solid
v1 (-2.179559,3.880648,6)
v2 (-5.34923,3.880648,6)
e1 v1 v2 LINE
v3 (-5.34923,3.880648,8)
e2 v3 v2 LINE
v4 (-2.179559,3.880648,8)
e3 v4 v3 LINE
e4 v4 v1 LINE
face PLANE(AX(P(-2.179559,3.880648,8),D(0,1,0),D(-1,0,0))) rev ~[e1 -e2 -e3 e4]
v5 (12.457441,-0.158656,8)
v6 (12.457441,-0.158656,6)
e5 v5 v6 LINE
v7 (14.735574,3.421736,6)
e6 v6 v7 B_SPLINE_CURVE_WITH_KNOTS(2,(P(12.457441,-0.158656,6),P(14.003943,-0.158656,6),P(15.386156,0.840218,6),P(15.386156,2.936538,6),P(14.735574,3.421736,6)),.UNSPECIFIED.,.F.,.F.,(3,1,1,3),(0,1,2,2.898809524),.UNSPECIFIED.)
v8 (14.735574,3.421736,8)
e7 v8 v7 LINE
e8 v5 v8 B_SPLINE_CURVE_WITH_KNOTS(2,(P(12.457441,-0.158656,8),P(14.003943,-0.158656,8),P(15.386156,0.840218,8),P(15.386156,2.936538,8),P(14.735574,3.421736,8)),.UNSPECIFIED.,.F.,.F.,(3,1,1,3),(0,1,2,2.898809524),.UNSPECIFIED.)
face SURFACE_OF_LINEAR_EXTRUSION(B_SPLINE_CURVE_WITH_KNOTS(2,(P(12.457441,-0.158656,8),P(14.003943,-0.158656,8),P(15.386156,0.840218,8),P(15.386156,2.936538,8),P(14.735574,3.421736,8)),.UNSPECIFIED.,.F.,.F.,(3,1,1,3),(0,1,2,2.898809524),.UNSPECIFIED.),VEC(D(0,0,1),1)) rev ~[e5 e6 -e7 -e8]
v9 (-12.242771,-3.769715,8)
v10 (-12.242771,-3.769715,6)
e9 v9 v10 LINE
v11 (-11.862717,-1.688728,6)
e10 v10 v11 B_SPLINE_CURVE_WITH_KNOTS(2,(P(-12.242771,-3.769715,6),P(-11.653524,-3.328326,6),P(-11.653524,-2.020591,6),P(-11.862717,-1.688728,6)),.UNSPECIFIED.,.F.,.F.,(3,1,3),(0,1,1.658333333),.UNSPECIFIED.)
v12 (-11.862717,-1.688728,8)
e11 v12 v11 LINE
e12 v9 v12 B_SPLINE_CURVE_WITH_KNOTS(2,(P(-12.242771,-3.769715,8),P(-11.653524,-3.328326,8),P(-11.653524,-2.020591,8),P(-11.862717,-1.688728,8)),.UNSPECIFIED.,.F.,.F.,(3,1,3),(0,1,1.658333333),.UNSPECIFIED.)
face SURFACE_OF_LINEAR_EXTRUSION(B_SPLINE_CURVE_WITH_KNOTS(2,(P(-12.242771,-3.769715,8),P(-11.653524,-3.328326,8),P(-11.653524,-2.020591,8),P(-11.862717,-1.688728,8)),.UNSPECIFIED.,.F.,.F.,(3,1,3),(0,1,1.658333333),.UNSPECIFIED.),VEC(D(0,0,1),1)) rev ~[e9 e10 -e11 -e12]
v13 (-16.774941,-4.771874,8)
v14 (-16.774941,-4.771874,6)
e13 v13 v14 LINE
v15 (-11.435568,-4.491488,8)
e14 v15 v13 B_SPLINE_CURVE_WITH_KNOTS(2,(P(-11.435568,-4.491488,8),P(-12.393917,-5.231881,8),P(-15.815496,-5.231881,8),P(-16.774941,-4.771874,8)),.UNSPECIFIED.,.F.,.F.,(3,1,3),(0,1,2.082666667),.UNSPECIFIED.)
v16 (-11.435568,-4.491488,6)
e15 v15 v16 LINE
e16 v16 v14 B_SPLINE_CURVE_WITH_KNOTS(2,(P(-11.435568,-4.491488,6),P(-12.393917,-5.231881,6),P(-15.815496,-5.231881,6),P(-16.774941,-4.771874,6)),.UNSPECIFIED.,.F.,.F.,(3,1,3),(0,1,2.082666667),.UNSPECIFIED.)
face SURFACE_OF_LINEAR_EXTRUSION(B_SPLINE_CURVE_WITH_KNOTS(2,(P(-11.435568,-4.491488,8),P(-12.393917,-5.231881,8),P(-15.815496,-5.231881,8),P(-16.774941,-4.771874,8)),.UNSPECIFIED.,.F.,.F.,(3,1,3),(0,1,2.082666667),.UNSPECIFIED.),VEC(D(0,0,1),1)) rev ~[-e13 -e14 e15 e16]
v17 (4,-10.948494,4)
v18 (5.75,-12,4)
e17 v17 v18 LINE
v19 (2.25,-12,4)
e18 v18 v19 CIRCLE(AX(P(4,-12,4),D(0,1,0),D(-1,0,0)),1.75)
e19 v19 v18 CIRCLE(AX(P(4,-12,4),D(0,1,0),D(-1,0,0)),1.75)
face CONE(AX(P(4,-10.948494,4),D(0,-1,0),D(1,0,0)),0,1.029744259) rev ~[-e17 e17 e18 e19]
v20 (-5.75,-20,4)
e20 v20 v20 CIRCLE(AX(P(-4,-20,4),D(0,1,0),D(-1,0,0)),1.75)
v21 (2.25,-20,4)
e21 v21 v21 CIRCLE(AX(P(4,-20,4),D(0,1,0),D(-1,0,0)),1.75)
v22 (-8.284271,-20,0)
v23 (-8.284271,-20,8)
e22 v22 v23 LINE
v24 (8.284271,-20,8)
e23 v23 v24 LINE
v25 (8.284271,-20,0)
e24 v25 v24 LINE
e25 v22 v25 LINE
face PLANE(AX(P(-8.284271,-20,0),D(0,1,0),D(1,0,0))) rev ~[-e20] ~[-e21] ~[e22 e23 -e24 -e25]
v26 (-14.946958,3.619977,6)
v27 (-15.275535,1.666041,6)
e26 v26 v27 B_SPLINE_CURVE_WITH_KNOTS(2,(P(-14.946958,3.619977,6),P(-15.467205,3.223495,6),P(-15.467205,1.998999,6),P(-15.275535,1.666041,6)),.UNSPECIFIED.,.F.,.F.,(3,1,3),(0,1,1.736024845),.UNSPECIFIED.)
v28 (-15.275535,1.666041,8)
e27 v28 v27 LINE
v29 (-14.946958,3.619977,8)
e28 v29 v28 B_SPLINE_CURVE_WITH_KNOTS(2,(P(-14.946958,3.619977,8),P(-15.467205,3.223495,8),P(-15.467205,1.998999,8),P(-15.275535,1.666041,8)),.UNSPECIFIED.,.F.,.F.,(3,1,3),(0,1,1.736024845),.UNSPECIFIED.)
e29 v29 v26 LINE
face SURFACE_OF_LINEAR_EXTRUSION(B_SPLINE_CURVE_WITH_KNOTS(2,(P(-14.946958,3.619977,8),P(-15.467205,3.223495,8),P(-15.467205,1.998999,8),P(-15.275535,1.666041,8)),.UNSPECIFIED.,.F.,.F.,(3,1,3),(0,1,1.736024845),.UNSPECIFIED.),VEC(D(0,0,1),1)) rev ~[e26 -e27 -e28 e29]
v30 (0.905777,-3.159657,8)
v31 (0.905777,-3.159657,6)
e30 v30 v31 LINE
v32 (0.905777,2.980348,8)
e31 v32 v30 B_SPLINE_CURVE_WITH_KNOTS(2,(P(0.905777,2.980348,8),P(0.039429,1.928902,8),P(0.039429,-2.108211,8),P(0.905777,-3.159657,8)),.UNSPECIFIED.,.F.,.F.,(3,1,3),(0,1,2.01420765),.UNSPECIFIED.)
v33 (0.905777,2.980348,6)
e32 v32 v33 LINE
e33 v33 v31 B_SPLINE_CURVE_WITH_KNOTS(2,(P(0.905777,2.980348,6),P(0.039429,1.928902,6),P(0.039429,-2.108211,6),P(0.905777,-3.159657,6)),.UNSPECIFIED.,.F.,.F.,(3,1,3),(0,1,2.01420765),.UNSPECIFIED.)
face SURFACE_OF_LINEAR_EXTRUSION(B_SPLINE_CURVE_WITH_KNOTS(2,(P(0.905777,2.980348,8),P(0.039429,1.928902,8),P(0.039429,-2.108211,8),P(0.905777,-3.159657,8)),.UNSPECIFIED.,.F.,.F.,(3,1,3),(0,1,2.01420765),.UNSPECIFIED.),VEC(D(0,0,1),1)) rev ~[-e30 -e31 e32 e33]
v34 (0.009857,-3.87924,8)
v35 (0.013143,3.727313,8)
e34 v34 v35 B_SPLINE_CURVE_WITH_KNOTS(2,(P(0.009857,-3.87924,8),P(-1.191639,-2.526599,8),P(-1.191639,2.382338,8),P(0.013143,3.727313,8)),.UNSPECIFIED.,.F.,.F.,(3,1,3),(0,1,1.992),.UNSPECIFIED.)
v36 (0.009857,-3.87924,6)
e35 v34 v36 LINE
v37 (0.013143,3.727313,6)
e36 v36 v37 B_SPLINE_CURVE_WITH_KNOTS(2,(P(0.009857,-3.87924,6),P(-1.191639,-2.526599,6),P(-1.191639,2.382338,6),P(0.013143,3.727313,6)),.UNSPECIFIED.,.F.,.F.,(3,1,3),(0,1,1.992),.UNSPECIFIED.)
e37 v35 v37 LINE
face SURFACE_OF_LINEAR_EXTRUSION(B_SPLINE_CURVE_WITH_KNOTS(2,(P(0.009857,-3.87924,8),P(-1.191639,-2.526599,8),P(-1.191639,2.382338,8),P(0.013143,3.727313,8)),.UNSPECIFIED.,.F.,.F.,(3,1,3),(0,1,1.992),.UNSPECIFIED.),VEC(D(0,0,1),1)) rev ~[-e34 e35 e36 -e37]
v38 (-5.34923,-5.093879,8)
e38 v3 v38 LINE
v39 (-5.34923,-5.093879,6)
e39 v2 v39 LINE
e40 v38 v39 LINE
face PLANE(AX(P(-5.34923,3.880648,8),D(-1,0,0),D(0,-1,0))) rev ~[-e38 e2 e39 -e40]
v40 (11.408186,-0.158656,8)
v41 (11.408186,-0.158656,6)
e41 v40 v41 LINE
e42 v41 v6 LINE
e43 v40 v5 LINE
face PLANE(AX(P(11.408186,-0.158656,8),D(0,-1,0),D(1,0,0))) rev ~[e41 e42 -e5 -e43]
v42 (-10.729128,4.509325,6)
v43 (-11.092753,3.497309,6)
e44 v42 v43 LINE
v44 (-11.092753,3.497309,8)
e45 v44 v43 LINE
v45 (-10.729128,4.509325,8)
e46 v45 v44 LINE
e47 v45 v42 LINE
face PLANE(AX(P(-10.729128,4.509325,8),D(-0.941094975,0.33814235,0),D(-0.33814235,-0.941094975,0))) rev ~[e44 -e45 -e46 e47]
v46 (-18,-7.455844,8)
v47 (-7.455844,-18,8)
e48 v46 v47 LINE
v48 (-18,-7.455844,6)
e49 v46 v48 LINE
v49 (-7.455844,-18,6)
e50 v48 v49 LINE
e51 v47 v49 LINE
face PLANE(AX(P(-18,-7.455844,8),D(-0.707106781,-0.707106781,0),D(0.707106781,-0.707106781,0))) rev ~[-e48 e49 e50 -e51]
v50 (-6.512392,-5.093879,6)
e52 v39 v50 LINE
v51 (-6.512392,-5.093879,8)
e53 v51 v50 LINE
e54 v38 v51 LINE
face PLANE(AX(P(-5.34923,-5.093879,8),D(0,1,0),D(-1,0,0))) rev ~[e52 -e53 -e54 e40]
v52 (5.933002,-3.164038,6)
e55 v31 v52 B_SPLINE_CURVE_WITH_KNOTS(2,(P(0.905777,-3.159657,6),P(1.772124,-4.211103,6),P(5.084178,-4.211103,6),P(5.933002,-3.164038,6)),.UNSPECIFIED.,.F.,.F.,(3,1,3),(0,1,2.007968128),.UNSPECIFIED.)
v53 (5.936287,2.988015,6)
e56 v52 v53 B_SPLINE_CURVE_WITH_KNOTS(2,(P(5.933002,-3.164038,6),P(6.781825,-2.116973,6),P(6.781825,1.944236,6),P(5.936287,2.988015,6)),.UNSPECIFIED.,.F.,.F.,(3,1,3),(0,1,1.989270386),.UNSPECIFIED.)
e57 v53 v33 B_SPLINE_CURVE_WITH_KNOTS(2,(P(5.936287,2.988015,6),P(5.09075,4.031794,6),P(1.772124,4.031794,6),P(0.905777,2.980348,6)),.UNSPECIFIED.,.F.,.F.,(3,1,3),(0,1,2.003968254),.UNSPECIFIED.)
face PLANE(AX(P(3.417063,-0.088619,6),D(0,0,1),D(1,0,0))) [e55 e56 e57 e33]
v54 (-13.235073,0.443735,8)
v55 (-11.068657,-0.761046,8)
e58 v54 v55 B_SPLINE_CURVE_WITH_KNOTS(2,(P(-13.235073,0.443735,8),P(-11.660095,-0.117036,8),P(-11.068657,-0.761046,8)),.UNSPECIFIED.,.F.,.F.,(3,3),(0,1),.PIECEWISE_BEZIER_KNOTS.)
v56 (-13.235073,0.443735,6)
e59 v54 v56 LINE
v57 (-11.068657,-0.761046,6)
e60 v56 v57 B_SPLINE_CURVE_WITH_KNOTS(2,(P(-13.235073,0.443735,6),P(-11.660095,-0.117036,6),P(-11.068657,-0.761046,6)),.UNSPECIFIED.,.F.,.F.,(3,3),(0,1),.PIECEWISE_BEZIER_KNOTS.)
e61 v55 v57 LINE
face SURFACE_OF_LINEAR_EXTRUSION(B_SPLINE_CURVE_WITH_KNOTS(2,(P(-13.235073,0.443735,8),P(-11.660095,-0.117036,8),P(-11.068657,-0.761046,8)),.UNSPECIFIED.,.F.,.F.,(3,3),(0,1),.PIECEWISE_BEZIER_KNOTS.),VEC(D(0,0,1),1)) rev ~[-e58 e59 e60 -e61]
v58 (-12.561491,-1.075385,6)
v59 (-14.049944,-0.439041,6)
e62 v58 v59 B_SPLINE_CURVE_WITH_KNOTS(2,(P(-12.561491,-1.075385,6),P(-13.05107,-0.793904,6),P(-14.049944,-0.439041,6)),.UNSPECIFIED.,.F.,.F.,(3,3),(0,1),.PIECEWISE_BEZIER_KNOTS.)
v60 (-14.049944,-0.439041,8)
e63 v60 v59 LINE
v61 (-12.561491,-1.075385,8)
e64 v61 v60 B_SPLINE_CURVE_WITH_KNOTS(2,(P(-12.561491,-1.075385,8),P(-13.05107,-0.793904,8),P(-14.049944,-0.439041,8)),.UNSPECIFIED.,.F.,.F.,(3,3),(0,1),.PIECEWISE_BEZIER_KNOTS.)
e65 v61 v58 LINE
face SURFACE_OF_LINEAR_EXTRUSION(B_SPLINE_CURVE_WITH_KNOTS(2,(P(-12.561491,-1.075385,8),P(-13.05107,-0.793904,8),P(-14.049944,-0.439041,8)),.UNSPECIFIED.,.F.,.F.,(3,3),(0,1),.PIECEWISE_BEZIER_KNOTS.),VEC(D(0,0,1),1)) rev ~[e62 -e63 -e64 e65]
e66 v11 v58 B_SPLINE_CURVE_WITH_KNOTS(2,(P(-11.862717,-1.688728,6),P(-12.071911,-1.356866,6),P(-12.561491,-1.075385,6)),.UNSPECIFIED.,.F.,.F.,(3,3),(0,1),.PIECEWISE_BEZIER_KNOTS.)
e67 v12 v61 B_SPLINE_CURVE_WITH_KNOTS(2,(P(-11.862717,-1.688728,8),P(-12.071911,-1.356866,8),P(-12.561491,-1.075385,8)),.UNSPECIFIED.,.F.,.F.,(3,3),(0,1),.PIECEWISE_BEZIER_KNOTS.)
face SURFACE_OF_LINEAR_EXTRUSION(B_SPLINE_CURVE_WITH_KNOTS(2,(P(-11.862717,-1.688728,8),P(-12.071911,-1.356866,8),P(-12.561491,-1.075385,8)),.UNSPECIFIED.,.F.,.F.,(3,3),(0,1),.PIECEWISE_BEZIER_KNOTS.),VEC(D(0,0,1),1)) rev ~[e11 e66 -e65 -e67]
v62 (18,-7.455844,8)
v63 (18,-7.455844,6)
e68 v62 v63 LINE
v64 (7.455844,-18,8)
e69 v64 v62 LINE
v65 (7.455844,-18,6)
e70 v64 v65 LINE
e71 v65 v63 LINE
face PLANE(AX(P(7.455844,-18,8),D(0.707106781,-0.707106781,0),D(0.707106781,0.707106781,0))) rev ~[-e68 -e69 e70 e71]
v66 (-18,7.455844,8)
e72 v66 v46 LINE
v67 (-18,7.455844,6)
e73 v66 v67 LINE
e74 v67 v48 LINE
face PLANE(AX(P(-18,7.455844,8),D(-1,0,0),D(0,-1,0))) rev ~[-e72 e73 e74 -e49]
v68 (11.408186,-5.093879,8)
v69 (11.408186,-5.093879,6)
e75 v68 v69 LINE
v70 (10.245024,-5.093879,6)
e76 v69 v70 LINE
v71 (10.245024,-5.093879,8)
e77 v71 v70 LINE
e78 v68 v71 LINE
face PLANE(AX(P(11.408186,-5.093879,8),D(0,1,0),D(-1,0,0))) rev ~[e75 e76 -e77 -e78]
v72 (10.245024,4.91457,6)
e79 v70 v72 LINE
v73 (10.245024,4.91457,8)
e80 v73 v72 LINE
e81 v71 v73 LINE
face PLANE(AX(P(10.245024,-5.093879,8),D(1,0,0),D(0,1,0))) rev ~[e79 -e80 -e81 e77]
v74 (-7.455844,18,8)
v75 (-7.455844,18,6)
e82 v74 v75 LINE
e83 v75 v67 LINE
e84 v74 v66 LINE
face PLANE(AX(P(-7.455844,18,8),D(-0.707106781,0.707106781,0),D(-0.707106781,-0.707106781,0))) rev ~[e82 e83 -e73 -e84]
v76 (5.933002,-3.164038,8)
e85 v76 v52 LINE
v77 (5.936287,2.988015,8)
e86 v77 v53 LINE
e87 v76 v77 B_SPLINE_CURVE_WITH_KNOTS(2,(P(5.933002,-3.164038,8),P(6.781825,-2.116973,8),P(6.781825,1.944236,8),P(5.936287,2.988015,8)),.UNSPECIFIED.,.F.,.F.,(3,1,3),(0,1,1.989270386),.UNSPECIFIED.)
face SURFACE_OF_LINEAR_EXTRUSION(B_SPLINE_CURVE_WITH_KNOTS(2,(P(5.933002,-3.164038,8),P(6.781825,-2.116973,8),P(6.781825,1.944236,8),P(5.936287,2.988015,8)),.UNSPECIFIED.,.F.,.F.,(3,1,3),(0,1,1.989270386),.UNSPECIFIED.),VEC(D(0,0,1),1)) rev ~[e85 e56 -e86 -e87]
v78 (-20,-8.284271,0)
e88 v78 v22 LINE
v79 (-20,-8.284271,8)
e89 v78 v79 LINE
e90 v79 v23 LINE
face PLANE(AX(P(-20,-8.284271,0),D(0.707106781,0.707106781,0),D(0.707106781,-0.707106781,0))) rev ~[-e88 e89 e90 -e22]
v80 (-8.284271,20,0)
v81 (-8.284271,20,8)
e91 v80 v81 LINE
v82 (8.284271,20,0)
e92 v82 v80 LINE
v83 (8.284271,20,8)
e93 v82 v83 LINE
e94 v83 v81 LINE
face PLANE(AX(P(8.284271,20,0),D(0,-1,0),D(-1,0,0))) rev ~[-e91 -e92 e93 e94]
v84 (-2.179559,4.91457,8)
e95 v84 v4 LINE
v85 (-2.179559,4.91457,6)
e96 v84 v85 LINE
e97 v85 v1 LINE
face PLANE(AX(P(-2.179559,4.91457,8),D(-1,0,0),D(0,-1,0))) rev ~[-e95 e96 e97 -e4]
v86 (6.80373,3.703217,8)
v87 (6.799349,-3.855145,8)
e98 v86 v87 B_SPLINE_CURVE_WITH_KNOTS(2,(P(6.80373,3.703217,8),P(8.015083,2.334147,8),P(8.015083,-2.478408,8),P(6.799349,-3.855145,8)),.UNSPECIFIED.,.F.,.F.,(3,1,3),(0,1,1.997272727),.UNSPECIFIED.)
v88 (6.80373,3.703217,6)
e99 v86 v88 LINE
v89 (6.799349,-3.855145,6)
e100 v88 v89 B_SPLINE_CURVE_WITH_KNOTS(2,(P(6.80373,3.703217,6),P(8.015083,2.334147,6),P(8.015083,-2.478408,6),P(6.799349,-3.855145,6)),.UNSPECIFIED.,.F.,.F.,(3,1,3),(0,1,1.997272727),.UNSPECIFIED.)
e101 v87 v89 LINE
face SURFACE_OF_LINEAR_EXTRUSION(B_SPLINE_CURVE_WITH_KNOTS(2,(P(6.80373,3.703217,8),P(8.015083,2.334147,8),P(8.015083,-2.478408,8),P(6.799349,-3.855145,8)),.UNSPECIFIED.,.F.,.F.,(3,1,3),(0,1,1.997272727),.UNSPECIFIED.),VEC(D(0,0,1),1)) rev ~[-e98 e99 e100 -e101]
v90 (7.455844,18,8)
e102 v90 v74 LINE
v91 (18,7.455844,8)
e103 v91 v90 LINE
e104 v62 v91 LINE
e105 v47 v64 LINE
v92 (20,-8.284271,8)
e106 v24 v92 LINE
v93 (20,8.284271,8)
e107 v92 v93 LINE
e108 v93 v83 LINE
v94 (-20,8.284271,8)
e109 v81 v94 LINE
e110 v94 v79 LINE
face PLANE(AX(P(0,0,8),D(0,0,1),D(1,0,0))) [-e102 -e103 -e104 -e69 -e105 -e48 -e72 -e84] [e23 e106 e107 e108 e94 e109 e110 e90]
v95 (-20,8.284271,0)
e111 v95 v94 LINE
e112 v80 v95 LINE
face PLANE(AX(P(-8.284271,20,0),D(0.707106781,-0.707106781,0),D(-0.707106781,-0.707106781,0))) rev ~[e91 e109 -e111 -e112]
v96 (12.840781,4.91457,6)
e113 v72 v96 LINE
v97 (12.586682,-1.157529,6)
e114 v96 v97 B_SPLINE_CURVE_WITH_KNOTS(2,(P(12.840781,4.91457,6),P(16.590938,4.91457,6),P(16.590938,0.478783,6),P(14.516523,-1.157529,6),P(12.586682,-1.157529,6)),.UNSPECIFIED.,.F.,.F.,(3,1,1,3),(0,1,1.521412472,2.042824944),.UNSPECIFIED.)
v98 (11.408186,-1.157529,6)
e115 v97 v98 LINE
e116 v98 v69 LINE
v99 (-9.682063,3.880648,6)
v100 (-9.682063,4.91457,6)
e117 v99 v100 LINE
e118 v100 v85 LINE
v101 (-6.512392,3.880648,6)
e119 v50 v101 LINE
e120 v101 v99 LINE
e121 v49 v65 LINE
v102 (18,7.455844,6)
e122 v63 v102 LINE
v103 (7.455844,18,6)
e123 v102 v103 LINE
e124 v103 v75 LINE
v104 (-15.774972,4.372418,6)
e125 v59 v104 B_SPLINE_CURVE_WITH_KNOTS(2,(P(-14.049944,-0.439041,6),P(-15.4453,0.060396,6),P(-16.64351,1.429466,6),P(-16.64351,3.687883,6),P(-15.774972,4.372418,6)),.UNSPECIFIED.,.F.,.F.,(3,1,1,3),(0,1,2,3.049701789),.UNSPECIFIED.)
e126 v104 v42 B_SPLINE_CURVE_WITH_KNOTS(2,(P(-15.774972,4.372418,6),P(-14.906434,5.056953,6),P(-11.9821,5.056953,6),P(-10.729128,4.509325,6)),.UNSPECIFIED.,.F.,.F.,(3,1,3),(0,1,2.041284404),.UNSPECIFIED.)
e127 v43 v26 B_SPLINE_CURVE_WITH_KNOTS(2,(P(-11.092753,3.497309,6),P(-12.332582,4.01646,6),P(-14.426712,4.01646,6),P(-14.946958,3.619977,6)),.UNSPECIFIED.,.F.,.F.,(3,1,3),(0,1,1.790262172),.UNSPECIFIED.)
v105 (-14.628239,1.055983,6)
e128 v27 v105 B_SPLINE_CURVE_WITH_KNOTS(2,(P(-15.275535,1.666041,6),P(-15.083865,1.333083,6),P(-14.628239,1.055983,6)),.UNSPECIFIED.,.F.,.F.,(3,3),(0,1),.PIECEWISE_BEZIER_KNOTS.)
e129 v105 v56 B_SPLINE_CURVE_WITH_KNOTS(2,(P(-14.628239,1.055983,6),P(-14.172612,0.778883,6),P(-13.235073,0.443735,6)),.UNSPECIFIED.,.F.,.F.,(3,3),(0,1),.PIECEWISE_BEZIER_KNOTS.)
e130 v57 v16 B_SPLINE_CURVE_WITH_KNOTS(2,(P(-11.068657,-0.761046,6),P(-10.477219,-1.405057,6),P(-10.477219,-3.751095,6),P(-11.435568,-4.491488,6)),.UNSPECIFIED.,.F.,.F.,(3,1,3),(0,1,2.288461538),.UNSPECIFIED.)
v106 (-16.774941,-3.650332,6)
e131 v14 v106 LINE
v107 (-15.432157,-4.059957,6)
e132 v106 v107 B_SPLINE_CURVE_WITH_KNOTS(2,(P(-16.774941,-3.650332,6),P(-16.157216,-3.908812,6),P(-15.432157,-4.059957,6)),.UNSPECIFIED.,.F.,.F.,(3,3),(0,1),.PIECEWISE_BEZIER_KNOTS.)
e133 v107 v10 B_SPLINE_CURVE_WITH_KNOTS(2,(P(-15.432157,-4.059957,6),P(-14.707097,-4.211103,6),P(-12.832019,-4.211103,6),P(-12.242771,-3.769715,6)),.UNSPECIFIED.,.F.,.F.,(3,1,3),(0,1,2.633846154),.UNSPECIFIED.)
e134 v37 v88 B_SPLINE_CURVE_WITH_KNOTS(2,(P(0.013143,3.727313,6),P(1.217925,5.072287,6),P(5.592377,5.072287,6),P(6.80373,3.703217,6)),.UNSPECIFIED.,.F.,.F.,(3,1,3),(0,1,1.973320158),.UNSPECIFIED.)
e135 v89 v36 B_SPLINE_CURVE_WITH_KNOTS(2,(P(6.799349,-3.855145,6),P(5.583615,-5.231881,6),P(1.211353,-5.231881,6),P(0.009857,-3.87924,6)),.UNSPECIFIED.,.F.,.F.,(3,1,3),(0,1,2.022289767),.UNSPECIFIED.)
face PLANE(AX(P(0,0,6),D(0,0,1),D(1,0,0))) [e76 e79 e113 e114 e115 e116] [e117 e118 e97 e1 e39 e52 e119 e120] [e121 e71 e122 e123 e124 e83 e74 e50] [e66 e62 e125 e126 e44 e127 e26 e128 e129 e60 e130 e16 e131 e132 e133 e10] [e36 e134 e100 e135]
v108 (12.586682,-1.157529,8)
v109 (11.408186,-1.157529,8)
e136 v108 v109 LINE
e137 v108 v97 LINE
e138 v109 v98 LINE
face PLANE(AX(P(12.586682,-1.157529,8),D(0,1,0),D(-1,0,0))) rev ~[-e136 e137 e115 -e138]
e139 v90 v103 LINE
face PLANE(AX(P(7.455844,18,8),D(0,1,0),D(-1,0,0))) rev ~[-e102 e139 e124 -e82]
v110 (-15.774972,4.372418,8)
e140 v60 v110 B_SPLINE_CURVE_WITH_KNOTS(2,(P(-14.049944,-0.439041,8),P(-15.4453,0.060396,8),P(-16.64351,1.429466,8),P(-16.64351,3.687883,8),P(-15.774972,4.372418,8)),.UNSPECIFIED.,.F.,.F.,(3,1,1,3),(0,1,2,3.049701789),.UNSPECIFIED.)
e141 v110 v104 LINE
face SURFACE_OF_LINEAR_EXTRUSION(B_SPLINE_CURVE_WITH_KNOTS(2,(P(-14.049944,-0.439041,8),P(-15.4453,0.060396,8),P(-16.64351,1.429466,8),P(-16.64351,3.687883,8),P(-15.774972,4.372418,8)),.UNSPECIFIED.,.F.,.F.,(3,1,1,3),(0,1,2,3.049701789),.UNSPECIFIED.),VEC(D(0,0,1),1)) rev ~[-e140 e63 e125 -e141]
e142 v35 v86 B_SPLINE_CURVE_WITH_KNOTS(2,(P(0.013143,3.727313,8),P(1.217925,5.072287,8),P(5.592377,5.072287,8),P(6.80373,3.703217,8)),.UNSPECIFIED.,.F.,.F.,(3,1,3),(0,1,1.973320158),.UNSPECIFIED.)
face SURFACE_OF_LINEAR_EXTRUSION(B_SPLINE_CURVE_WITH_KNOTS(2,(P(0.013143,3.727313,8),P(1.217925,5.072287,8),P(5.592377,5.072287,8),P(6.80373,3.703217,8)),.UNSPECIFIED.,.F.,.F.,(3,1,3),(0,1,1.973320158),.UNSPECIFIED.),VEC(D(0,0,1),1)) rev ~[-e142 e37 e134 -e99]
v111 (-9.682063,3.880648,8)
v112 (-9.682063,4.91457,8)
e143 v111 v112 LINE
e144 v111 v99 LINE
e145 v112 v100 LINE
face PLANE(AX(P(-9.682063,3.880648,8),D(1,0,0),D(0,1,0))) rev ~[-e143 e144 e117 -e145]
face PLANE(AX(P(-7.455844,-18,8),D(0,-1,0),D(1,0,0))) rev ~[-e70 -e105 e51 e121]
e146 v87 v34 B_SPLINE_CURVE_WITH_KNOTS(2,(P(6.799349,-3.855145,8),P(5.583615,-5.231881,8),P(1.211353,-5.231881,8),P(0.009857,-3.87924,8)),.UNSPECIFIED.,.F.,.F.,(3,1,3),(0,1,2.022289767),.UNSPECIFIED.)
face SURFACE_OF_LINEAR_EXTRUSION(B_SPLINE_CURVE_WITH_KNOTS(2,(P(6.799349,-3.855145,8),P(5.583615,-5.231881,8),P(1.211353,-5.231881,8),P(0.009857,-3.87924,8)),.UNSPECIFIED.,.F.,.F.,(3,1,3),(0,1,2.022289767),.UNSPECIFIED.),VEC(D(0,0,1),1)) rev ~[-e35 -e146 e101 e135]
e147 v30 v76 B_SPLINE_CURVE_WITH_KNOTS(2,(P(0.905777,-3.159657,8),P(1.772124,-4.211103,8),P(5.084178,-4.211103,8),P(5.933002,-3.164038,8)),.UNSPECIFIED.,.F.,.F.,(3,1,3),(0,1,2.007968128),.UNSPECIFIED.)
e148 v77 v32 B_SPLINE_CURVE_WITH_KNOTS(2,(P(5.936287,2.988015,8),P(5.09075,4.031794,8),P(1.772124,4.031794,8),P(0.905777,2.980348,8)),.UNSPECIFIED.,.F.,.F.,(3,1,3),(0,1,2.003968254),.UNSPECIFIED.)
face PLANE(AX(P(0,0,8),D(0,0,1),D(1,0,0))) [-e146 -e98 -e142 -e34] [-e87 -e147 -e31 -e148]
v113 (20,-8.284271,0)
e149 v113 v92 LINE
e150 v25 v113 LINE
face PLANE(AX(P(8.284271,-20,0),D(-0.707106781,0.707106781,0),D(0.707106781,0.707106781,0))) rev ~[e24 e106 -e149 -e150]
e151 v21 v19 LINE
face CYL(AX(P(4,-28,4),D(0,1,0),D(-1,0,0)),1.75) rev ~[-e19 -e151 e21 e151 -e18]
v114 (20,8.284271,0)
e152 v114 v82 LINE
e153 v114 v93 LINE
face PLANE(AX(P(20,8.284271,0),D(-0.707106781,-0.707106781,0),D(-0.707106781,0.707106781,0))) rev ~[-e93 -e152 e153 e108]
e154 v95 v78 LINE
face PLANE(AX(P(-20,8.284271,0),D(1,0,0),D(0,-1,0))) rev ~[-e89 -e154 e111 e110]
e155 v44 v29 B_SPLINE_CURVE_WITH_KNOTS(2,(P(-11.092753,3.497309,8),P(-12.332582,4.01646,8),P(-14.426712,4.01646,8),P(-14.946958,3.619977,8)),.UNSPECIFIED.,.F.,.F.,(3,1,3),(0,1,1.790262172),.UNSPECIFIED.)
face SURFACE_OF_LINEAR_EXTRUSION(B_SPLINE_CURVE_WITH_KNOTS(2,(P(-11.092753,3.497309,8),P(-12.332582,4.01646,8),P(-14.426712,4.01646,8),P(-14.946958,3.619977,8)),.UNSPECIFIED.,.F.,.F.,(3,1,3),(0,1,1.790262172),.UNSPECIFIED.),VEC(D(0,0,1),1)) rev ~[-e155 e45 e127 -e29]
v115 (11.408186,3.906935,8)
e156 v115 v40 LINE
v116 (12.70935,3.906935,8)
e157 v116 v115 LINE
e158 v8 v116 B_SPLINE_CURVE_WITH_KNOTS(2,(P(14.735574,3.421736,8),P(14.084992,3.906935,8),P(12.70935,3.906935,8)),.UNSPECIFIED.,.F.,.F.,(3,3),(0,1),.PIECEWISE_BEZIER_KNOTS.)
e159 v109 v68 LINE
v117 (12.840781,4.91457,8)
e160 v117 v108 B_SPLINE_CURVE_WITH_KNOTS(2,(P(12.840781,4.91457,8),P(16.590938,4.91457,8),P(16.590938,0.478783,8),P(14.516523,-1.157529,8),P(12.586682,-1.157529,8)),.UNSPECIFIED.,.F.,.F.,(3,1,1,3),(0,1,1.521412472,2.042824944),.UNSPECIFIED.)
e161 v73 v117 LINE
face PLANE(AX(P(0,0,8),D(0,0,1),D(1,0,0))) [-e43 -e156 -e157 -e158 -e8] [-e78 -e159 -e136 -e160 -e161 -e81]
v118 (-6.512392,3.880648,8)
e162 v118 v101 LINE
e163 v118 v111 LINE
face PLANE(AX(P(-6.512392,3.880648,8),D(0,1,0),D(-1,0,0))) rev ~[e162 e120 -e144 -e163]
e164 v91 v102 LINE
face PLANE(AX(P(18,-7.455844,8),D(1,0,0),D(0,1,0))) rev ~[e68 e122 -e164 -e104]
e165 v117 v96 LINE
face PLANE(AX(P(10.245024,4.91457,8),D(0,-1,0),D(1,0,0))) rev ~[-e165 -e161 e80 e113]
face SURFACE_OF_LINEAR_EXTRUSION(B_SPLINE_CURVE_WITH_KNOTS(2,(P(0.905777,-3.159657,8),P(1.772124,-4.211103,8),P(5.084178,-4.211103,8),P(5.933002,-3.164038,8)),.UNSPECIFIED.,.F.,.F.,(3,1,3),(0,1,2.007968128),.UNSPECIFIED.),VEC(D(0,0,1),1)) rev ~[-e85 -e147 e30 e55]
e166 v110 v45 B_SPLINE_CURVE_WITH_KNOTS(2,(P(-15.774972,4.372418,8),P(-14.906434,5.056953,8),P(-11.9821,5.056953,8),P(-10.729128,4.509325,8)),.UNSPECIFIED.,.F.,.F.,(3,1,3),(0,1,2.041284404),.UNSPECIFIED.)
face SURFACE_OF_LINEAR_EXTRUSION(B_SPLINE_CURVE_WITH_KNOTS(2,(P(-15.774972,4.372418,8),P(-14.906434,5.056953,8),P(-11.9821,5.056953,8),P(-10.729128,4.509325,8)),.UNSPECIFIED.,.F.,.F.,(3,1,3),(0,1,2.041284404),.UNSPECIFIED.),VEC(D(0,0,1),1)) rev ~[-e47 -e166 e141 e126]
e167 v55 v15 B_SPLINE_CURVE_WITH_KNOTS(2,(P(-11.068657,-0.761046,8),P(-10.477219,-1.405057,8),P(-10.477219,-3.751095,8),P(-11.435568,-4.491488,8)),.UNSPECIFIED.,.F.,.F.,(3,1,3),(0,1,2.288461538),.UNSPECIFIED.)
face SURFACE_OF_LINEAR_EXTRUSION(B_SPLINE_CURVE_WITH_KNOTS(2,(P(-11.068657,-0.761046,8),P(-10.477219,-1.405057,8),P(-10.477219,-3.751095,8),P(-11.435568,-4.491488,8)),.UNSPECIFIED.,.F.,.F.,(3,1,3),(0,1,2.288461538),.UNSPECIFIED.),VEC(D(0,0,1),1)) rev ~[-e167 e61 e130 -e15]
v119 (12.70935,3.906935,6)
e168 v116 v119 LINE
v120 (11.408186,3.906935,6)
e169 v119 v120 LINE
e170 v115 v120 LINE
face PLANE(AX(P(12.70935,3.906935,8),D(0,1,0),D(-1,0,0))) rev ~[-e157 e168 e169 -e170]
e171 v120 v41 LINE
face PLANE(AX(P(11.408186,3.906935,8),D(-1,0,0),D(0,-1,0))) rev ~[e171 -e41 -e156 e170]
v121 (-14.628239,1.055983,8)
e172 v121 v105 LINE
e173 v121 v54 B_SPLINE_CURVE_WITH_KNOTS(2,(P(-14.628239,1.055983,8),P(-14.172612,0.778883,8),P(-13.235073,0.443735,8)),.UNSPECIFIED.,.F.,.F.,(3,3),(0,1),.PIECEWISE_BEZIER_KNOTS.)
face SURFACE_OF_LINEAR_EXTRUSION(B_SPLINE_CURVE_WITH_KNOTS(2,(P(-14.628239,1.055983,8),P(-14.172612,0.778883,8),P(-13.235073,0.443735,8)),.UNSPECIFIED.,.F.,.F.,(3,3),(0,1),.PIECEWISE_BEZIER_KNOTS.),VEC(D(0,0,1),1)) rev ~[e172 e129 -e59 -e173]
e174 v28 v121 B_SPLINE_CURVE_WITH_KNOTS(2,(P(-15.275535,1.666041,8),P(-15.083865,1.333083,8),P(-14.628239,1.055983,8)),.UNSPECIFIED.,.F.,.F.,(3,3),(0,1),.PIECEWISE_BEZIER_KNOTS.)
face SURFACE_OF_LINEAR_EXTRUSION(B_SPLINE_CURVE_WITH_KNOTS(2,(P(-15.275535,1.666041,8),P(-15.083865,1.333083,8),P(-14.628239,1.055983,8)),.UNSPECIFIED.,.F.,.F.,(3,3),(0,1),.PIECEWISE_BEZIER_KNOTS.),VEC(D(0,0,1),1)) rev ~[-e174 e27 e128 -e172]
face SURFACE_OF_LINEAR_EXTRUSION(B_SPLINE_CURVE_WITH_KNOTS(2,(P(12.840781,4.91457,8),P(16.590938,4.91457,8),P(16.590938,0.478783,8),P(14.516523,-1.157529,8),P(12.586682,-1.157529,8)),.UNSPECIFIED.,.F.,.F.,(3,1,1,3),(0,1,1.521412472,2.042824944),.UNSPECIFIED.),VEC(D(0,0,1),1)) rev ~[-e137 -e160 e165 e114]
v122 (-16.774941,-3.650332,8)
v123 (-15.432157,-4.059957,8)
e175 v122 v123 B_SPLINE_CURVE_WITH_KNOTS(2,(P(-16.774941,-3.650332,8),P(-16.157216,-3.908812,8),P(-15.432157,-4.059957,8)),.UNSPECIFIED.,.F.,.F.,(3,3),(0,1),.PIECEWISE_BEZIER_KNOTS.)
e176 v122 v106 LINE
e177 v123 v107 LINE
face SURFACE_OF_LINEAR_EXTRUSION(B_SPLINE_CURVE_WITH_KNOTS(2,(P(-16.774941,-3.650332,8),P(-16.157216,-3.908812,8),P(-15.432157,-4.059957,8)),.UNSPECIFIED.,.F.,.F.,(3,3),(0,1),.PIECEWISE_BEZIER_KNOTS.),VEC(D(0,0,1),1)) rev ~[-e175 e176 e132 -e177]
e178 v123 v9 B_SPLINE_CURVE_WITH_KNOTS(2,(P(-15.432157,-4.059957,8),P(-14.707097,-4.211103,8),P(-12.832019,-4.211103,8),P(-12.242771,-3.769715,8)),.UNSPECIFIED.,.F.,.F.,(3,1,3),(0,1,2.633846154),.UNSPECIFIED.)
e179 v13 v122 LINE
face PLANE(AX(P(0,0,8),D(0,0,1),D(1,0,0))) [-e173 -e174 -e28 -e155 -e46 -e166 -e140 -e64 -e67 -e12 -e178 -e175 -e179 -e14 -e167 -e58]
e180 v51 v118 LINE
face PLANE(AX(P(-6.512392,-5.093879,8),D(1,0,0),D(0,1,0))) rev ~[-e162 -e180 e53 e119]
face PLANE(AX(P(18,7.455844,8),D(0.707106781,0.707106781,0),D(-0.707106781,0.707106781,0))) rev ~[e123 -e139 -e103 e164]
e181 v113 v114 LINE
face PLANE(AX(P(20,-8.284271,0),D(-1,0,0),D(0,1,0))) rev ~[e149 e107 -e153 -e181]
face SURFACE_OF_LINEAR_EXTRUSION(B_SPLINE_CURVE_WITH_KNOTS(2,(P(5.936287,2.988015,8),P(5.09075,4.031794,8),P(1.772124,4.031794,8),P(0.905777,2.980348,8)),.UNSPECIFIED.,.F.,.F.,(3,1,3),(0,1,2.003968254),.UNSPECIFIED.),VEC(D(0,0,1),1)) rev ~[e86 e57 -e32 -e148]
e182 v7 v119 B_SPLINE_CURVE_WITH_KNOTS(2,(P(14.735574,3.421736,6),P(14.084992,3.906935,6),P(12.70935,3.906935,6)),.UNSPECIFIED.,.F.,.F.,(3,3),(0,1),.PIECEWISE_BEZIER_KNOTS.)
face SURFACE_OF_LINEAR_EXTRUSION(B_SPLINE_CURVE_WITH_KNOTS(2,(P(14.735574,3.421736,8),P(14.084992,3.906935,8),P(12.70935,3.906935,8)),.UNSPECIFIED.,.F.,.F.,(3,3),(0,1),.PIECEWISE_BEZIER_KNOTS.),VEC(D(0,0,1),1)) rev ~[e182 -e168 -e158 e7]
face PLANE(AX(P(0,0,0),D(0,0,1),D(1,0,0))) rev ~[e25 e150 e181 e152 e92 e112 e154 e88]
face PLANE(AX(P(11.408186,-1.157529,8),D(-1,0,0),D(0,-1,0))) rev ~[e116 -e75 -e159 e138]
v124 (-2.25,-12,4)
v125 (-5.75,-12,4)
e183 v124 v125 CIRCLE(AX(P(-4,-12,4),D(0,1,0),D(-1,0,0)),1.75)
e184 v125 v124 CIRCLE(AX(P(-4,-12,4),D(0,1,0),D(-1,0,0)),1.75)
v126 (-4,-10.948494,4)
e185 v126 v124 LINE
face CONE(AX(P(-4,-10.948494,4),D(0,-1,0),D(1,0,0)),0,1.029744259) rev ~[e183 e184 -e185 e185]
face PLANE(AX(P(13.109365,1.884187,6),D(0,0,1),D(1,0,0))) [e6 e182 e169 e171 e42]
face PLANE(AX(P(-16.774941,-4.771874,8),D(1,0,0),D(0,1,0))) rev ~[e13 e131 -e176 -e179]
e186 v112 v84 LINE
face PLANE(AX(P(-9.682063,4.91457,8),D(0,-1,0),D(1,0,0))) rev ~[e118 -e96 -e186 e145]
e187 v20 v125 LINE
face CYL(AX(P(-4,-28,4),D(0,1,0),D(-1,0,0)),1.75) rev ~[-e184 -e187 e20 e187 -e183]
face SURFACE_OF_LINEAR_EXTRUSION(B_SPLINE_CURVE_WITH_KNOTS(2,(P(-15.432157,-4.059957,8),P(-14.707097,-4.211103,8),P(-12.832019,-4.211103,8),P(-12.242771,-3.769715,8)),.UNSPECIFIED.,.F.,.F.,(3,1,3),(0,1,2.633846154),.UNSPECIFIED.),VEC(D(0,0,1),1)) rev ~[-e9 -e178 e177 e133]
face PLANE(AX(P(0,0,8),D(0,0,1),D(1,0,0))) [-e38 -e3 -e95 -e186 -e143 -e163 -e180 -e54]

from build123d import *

# Parameters (mm, degrees)
F1_DEPTH = 8
F3_DEPTH = 2
F5_D     = 3.5
F5_DEPTH = 8
F5_TIP   = 1.0515060833


with BuildPart() as f1:
    # F0 (on Top) → F1 (new body)
    with BuildSketch(Plane.XY):
        Polygon((20, -8.2842712475), (20, 8.2842712475), (8.2842712475, 20), (-8.2842712475, 20), (-20, 8.2842712475), (-20, -8.2842712475), (-8.2842712475, -20), (8.2842712475, -20), align=None)
    extrude(amount=F1_DEPTH)

    # F2 (on face) → F3 (cut)
    with BuildSketch(Plane.XY.offset(8)):
        Polygon((18, -7.4558441227), (18, 7.4558441227), (7.4558441227, 18), (-7.4558441227, 18), (-18, 7.4558441227), (-18, -7.4558441227), (-7.4558441227, -18), (7.4558441227, -18), align=None)
        with BuildLine():
            add(Edge.make_bspline(
                [(-11.0686569032, -0.7610464389), (-10.4772186757, -1.4050569533), (-10.4772186757, -2.4302165478)],
                knots=[0, 0, 0, 1, 1, 1], degree=2))
            add(Edge.make_bspline(
                [(-10.4772186757, -2.4302165478), (-10.4772186757, -3.751095256), (-11.4355676555, -4.4914882964)],
                knots=[0, 0, 0, 1, 1, 1], degree=2))
            add(Edge.make_bspline(
                [(-11.4355676555, -4.4914882964), (-12.3939166354, -5.2318813368), (-14.0368006008, -5.2318813368)],
                knots=[0, 0, 0, 1, 1, 1], degree=2))
            add(Edge.make_bspline(
                [(-14.0368006008, -5.2318813368), (-15.8154963074, -5.2318813368), (-16.7749405432, -4.7718738265)],
                knots=[0, 0, 0, 1, 1, 1], degree=2))
            Line((-16.7749405432, -4.7718738265), (-16.7749405432, -3.6503317061))
            add(Edge.make_bspline(
                [(-16.7749405432, -3.6503317061), (-16.1572161722, -3.9088121167), (-15.4321567155, -4.0599574415)],
                knots=[0, 0, 0, 1, 1, 1], degree=2))
            add(Edge.make_bspline(
                [(-15.4321567155, -4.0599574415), (-14.7070972587, -4.2111027663), (-13.9951808737, -4.2111027663)],
                knots=[0, 0, 0, 1, 1, 1], degree=2))
            add(Edge.make_bspline(
                [(-13.9951808737, -4.2111027663), (-12.8320190262, -4.2111027663), (-12.2427713106, -3.7697146076)],
                knots=[0, 0, 0, 1, 1, 1], degree=2))
            add(Edge.make_bspline(
                [(-12.2427713106, -3.7697146076), (-11.6535235949, -3.3283264489), (-11.6535235949, -2.5397421454)],
                knots=[0, 0, 0, 1, 1, 1], degree=2))
            add(Edge.make_bspline(
                [(-11.6535235949, -2.5397421454), (-11.6535235949, -2.0205908124), (-11.8627174865, -1.6887282513)],
                knots=[0, 0, 0, 1, 1, 1], degree=2))
            add(Edge.make_bspline(
                [(-11.8627174865, -1.6887282513), (-12.0719113781, -1.3568656903), (-12.5614907998, -1.0753849042)],
                knots=[0, 0, 0, 1, 1, 1], degree=2))
            add(Edge.make_bspline(
                [(-12.5614907998, -1.0753849042), (-13.0510702216, -0.7939041182), (-14.0499436725, -0.4390411816)],
                knots=[0, 0, 0, 1, 1, 1], degree=2))
            add(Edge.make_bspline(
                [(-14.0499436725, -0.4390411816), (-15.4452997872, 0.0603955439), (-16.0444048066, 0.7449305295)],
                knots=[0, 0, 0, 1, 1, 1], degree=2))
            add(Edge.make_bspline(
                [(-16.0444048066, 0.7449305295), (-16.643509826, 1.4294655151), (-16.643509826, 2.5312930279)],
                knots=[0, 0, 0, 1, 1, 1], degree=2))
            add(Edge.make_bspline(
                [(-16.643509826, 2.5312930279), (-16.643509826, 3.6878833396), (-15.7749718363, 4.3724183252)],
                knots=[0, 0, 0, 1, 1, 1], degree=2))
            add(Edge.make_bspline(
                [(-15.7749718363, 4.3724183252), (-14.9064338465, 5.0569533108), (-13.4738390287, 5.0569533108)],
                knots=[0, 0, 0, 1, 1, 1], degree=2))
            add(Edge.make_bspline(
                [(-13.4738390287, 5.0569533108), (-11.982100388, 5.0569533108), (-10.7291275504, 4.5093253223)],
                knots=[0, 0, 0, 1, 1, 1], degree=2))
            Line((-10.7291275504, 4.5093253223), (-11.0927525347, 3.4973087996))
            add(Edge.make_bspline(
                [(-11.0927525347, 3.4973087996), (-12.3325823007, 4.0164601327), (-13.5023156841, 4.0164601327)],
                knots=[0, 0, 0, 1, 1, 1], degree=2))
            add(Edge.make_bspline(
                [(-13.5023156841, 4.0164601327), (-14.4267117286, 4.0164601327), (-14.9469583177, 3.619977469)],
                knots=[0, 0, 0, 1, 1, 1], degree=2))
            add(Edge.make_bspline(
                [(-14.9469583177, 3.619977469), (-15.4672049067, 3.2234948054), (-15.4672049067, 2.5181499562)],
                knots=[0, 0, 0, 1, 1, 1], degree=2))
            add(Edge.make_bspline(
                [(-15.4672049067, 2.5181499562), (-15.4672049067, 1.9989986231), (-15.2755351108, 1.6660408061)],
                knots=[0, 0, 0, 1, 1, 1], degree=2))
            add(Edge.make_bspline(
                [(-15.2755351108, 1.6660408061), (-15.0838653148, 1.3330829891), (-14.6282388284, 1.0559832269)],
                knots=[0, 0, 0, 1, 1, 1], degree=2))
            add(Edge.make_bspline(
                [(-14.6282388284, 1.0559832269), (-14.172612342, 0.7788834648), (-13.2350732257, 0.4437351358)],
                knots=[0, 0, 0, 1, 1, 1], degree=2))
            add(Edge.make_bspline(
                [(-13.2350732257, 0.4437351358), (-11.6600951308, -0.1170359244), (-11.0686569032, -0.7610464389)],
                knots=[0, 0, 0, 1, 1, 1], degree=2))
        make_face(mode=Mode.SUBTRACT)
        Polygon((-5.3492301915, 3.8806483915), (-5.3492301915, -5.0938790837), (-6.5123920391, -5.0938790837), (-6.5123920391, 3.8806483915), (-9.6820628364, 3.8806483915), (-9.6820628364, 4.9145700338), (-2.1795593942, 4.9145700338), (-2.1795593942, 3.8806483915), align=None, mode=Mode.SUBTRACT)
        with BuildLine():
            add(Edge.make_bspline(
                [(6.8037301289, 3.7032169233), (8.0150832395, 2.3341469521), (8.0150832395, -0.0754161973)],
                knots=[0, 0, 0, 1, 1, 1], degree=2))
            add(Edge.make_bspline(
                [(8.0150832395, -0.0754161973), (8.0150832395, -2.4784078107), (6.799349105, -3.8551445738)],
                knots=[0, 0, 0, 1, 1, 1], degree=2))
            add(Edge.make_bspline(
                [(6.799349105, -3.8551445738), (5.5836149706, -5.2318813368), (3.421579672, -5.2318813368)],
                knots=[0, 0, 0, 1, 1, 1], degree=2))
            add(Edge.make_bspline(
                [(3.421579672, -5.2318813368), (1.2113531105, -5.2318813368), (0.0098573038, -3.8792402053)],
                knots=[0, 0, 0, 1, 1, 1], degree=2))
            add(Edge.make_bspline(
                [(0.0098573038, -3.8792402053), (-1.1916385029, -2.5265990737), (-1.1916385029, -0.0622731255)],
                knots=[0, 0, 0, 1, 1, 1], degree=2))
            add(Edge.make_bspline(
                [(-1.1916385029, -0.0622731255), (-1.1916385029, 2.382338215), (0.0131430717, 3.7273125548)],
                knots=[0, 0, 0, 1, 1, 1], degree=2))
            add(Edge.make_bspline(
                [(0.0131430717, 3.7273125548), (1.2179246464, 5.0722868945), (3.4347227438, 5.0722868945)],
                knots=[0, 0, 0, 1, 1, 1], degree=2))
            add(Edge.make_bspline(
                [(3.4347227438, 5.0722868945), (5.5923770184, 5.0722868945), (6.8037301289, 3.7032169233)],
                knots=[0, 0, 0, 1, 1, 1], degree=2))
        make_face(mode=Mode.SUBTRACT)
        with BuildLine():
            add(Edge.make_bspline(
                [(12.840781074, 4.9145700338), (16.5909375391, 4.9145700338), (16.5909375391, 1.9989986231)],
                knots=[0, 0, 0, 1, 1, 1], degree=2))
            add(Edge.make_bspline(
                [(16.5909375391, 1.9989986231), (16.5909375391, 0.4787833271), (15.5537301289, -0.3393728877)],
                knots=[0, 0, 0, 1, 1, 1], degree=2))
            add(Edge.make_bspline(
                [(15.5537301289, -0.3393728877), (14.5165227187, -1.1575291025), (12.5866816873, -1.1575291025)],
                knots=[0, 0, 0, 1, 1, 1], degree=2))
            Line((12.5866816873, -1.1575291025), (11.4081862561, -1.1575291025))
            Line((11.4081862561, -1.1575291025), (11.4081862561, -5.0938790837))
            Line((11.4081862561, -5.0938790837), (10.2450244086, -5.0938790837))
            Line((10.2450244086, -5.0938790837), (10.2450244086, 4.9145700338))
            Line((10.2450244086, 4.9145700338), (12.840781074, 4.9145700338))
        make_face(mode=Mode.SUBTRACT)
        with BuildLine():
            add(Edge.make_bspline(
                [(0.905776693, 2.9803479785), (0.0394292152, 1.9289022406), (0.0394292152, -0.0754161973)],
                knots=[0, 0, 0, 1, 1, 1], degree=2))
            add(Edge.make_bspline(
                [(0.0394292152, -0.0754161973), (0.0394292152, -2.1082112905), (0.905776693, -3.1596570284)],
                knots=[0, 0, 0, 1, 1, 1], degree=2))
            add(Edge.make_bspline(
                [(0.905776693, -3.1596570284), (1.7721241707, -4.2111027663), (3.421579672, -4.2111027663)],
                knots=[0, 0, 0, 1, 1, 1], degree=2))
            add(Edge.make_bspline(
                [(3.421579672, -4.2111027663), (5.0841782451, -4.2111027663), (5.9330016272, -3.1640380523)],
                knots=[0, 0, 0, 1, 1, 1], degree=2))
            add(Edge.make_bspline(
                [(5.9330016272, -3.1640380523), (6.7818250094, -2.1169733383), (6.7818250094, -0.0754161973)],
                knots=[0, 0, 0, 1, 1, 1], degree=2))
            add(Edge.make_bspline(
                [(6.7818250094, -0.0754161973), (6.7818250094, 1.9442358243), (5.9362873952, 2.9880147703)],
                knots=[0, 0, 0, 1, 1, 1], degree=2))
            add(Edge.make_bspline(
                [(5.9362873952, 2.9880147703), (5.0907497809, 4.0317937164), (3.4347227438, 4.0317937164)],
                knots=[0, 0, 0, 1, 1, 1], degree=2))
            add(Edge.make_bspline(
                [(3.4347227438, 4.0317937164), (1.7721241707, 4.0317937164), (0.905776693, 2.9803479785)],
                knots=[0, 0, 0, 1, 1, 1], degree=2))
        make_face()
        with BuildLine():
            Line((11.4081862561, 3.906934535), (11.4081862561, -0.1586556515))
            Line((11.4081862561, -0.1586556515), (12.457441482, -0.1586556515))
            add(Edge.make_bspline(
                [(12.457441482, -0.1586556515), (14.0039429215, -0.1586556515), (14.695049443, 0.340781074)],
                knots=[0, 0, 0, 1, 1, 1], degree=2))
            add(Edge.make_bspline(
                [(14.695049443, 0.340781074), (15.3861559645, 0.8402177995), (15.3861559645, 1.9442358243)],
                knots=[0, 0, 0, 1, 1, 1], degree=2))
            add(Edge.make_bspline(
                [(15.3861559645, 1.9442358243), (15.3861559645, 2.9365377394), (14.7355739141, 3.4217361372)],
                knots=[0, 0, 0, 1, 1, 1], degree=2))
            add(Edge.make_bspline(
                [(14.7355739141, 3.4217361372), (14.0849918638, 3.906934535), (12.7093503567, 3.906934535)],
                knots=[0, 0, 0, 1, 1, 1], degree=2))
            Line((12.7093503567, 3.906934535), (11.4081862561, 3.906934535))
        make_face()
    extrude(amount=-F3_DEPTH, mode=Mode.SUBTRACT)

    # F5
    with Locations(Plane.XZ.offset(20)):
        with Locations((-4, 4), (4, 4)):
            Hole(F5_D / 2, depth=F5_DEPTH)
            with Locations((0, 0, -(F5_DEPTH + F5_TIP / 2))):  # 118° drill point
                Cone(0, F5_D / 2, F5_TIP, mode=Mode.SUBTRACT)


solid = f1.part
